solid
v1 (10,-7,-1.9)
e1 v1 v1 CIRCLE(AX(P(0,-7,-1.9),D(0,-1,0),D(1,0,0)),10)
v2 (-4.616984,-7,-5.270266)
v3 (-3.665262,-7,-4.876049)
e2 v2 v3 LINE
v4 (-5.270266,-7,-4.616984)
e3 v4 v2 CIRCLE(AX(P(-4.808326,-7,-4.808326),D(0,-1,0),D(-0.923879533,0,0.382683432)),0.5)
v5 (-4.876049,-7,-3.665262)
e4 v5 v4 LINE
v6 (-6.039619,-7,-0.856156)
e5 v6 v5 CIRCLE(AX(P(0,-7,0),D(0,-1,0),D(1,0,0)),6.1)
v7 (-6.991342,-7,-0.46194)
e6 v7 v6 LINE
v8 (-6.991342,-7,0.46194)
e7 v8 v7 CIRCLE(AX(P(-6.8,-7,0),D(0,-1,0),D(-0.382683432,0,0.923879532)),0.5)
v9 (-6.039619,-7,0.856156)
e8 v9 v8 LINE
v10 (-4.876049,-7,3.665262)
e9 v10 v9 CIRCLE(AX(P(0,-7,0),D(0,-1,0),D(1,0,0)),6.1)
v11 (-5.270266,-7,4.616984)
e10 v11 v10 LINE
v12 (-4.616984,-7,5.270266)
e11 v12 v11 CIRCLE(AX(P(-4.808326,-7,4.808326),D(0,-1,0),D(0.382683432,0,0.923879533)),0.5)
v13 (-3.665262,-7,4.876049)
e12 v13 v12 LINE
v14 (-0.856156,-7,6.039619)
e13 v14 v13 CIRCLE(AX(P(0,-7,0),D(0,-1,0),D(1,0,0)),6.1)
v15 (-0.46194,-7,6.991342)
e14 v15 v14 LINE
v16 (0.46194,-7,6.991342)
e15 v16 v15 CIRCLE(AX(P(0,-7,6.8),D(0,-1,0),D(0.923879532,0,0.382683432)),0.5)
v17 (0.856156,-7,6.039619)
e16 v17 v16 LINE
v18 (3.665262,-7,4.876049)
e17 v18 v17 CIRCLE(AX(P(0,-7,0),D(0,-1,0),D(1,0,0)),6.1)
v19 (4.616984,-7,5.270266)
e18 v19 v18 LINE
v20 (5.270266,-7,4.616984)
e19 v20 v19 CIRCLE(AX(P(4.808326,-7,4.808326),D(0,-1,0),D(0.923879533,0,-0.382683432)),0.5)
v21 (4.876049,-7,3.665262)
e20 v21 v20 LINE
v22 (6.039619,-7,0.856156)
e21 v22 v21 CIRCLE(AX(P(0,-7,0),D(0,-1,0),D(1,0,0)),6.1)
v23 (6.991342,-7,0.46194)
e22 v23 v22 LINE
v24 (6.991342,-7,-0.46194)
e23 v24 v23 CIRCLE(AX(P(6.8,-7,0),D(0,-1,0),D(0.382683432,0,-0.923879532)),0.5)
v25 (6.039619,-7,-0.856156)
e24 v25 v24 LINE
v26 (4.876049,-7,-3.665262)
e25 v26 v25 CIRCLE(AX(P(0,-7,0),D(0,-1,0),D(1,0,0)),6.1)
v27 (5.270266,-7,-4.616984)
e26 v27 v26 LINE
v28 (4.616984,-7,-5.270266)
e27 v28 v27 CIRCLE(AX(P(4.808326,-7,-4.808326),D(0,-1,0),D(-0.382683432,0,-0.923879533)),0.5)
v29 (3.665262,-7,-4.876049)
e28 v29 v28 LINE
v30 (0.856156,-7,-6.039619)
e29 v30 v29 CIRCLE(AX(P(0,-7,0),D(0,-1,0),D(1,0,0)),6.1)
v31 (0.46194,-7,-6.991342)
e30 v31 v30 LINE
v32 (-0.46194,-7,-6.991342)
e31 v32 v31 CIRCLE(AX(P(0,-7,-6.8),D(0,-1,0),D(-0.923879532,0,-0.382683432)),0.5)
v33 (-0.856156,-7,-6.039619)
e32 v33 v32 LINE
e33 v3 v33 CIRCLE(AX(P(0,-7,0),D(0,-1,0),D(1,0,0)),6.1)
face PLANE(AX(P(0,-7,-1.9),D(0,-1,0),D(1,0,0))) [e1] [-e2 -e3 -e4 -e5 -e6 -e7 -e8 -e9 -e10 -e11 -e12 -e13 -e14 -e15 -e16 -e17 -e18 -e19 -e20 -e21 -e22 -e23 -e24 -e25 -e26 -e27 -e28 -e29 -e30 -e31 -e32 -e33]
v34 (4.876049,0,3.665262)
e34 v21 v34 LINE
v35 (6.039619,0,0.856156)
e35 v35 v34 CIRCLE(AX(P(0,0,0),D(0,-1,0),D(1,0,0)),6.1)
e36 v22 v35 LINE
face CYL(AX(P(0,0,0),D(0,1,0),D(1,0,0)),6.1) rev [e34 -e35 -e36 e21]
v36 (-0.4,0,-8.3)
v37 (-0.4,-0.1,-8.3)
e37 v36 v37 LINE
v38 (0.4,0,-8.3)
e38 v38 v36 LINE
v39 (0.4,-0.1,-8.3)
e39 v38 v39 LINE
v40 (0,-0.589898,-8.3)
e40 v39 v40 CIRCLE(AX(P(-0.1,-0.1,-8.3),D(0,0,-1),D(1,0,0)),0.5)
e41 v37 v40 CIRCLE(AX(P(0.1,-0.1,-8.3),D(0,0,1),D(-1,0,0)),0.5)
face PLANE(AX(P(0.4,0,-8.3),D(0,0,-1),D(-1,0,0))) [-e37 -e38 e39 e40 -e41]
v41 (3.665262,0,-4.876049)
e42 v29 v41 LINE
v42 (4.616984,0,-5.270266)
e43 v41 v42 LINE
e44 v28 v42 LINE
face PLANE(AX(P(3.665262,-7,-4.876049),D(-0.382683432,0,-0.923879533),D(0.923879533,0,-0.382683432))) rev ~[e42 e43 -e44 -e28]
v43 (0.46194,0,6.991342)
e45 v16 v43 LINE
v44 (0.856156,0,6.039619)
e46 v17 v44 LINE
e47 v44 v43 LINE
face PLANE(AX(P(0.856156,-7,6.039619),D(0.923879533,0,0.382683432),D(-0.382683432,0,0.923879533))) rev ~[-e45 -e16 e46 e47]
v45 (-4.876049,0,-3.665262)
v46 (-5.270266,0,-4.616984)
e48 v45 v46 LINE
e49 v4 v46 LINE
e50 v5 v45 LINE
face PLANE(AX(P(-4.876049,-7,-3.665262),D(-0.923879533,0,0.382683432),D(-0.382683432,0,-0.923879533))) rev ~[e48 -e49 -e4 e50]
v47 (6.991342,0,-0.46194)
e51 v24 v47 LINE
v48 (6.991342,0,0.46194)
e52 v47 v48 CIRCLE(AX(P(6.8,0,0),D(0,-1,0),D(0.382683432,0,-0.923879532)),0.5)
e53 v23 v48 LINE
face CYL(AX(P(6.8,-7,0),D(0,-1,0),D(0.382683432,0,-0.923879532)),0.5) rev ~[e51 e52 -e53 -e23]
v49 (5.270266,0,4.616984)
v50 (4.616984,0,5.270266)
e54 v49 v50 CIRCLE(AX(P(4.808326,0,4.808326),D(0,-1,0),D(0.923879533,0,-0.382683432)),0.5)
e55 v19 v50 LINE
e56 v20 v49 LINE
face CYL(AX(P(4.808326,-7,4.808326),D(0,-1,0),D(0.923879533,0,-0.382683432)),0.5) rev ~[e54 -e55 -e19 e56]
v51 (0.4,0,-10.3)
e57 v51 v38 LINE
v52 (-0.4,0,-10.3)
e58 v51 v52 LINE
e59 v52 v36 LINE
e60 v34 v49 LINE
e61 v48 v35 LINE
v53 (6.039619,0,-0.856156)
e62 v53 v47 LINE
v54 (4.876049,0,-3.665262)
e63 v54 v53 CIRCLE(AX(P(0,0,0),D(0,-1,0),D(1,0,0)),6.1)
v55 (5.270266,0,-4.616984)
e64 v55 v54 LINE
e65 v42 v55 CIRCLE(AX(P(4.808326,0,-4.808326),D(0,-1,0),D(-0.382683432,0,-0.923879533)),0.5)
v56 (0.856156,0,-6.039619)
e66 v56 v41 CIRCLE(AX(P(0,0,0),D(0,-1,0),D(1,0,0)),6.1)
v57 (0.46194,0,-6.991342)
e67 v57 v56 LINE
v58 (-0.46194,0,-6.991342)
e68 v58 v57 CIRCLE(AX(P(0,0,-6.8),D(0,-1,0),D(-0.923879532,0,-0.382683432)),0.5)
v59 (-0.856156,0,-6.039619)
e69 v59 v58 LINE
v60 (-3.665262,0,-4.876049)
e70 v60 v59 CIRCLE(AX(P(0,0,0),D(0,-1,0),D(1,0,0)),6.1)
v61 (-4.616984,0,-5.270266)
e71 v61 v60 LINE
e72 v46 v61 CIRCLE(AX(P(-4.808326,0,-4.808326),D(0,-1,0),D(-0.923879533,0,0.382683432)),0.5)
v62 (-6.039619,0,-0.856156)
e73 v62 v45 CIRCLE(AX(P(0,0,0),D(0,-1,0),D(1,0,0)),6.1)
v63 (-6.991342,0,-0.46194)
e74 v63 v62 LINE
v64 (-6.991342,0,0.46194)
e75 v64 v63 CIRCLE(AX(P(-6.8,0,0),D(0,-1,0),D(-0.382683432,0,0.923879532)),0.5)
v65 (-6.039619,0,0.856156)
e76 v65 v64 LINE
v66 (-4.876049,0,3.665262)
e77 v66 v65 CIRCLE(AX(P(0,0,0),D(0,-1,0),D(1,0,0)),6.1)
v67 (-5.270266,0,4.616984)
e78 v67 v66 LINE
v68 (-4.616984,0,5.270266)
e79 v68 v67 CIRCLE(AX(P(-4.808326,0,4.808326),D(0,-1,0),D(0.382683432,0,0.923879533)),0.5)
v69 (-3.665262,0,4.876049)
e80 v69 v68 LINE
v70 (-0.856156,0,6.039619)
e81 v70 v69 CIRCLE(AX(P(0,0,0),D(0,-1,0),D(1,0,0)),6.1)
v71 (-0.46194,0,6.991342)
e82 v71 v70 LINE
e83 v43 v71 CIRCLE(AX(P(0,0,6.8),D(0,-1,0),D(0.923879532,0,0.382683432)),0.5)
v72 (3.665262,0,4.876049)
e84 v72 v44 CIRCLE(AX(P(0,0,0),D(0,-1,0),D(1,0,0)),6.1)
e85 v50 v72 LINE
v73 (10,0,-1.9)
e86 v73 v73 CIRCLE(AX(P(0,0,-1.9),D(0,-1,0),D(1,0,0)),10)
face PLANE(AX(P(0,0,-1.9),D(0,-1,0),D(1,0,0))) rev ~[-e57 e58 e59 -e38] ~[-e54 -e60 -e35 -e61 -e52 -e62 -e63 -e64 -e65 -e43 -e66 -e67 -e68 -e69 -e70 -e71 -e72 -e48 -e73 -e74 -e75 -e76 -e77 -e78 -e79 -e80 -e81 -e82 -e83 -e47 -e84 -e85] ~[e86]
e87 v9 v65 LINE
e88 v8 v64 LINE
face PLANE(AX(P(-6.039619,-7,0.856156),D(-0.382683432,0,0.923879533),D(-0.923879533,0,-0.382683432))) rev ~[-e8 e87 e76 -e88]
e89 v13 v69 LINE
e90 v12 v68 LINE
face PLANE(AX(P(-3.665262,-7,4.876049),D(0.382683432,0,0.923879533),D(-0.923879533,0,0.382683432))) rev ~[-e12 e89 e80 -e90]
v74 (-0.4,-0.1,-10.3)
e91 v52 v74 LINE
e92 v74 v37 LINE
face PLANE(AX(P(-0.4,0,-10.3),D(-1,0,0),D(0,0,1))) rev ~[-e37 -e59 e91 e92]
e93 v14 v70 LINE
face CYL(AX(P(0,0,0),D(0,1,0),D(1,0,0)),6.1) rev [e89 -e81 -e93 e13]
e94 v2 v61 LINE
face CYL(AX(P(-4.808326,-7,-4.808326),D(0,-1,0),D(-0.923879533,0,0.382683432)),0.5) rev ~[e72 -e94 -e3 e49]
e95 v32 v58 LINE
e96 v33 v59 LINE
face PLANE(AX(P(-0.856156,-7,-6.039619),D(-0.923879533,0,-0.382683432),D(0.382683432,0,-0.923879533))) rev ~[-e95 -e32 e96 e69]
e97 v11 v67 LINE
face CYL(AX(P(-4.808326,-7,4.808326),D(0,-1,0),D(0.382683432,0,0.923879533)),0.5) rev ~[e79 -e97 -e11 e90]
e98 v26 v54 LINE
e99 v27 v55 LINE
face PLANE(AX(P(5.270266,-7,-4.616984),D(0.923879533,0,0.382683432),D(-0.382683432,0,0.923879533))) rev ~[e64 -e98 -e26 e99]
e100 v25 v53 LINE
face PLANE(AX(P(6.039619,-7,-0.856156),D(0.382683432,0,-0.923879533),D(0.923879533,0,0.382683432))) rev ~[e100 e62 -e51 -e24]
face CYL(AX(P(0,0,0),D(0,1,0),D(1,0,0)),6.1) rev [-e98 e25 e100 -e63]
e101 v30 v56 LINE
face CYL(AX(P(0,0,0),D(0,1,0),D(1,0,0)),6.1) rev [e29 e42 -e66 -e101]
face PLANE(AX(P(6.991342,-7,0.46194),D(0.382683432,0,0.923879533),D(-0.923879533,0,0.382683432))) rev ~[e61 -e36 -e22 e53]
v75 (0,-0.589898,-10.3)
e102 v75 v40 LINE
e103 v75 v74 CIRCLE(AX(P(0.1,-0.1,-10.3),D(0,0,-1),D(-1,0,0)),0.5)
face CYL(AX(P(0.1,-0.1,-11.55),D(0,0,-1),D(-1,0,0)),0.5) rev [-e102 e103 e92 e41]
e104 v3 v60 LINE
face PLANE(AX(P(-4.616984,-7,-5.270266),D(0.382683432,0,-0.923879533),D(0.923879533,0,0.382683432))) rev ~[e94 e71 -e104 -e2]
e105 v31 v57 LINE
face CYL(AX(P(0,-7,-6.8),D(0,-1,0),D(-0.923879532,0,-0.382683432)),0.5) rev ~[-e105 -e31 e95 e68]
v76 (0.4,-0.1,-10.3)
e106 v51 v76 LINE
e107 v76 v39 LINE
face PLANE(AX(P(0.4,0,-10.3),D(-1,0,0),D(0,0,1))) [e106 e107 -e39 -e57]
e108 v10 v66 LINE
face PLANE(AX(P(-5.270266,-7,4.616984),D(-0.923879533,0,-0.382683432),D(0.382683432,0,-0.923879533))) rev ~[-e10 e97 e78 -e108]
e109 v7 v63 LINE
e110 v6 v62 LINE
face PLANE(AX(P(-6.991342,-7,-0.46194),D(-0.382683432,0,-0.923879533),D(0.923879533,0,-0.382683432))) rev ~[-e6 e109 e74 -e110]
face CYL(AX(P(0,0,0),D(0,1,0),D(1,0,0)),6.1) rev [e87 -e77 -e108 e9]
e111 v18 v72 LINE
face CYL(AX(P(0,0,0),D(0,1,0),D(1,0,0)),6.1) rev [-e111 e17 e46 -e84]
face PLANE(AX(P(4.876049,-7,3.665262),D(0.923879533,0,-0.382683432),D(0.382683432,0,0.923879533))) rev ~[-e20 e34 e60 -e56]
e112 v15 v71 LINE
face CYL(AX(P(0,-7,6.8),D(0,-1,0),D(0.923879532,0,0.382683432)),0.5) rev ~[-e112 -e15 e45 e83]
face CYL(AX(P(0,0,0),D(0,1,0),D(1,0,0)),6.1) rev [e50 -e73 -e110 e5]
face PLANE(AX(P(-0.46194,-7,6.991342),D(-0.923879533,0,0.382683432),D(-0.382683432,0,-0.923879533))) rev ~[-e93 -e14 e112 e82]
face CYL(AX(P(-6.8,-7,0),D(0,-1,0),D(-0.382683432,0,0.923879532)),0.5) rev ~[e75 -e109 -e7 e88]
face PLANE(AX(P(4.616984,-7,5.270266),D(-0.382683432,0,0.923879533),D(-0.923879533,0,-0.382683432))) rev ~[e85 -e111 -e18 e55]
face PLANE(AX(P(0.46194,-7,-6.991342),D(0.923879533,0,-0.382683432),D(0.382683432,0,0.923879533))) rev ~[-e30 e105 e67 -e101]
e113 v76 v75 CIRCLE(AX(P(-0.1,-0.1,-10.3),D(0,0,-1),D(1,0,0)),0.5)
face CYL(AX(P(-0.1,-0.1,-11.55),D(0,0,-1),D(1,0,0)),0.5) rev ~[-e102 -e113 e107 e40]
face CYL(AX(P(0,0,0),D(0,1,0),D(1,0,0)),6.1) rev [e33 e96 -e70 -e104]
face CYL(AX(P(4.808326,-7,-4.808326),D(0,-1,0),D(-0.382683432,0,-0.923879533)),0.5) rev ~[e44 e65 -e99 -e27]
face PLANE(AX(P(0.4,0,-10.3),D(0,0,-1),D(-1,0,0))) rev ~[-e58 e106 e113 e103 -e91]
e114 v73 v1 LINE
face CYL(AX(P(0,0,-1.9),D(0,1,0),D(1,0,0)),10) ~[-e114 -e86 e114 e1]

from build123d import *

# Parameters (mm, degrees)
F0_R            = 10
F0_R_2          = 6.1
F1_DEPTH        = 7
F3_DEPTH        = 7
F3_COPIES_COUNT = 8
F4_W            = 0.8
F4_H            = 2
F5_DEPTH        = 0.6
F6_T1_DEPTH     = 3.25


# Not quite as in the source:
# - a fillet or chamfer that OpenCascade refuses, or shapes differently, is made with other operations: its cross-section is extruded or revolved along the edge and cut away or added
# - a pattern or mirror of a feature is missing from the dataset's text; its kind, count and spacing are read off the source's solid


with BuildPart() as f1:
    # F0 (on Front) → F1 (new body)
    with BuildSketch(Plane.XZ):
        with Locations((0, -1.9)):
            Circle(F0_R)
        Circle(F0_R_2, mode=Mode.SUBTRACT)
    extrude(amount=F1_DEPTH)

    # F2 (on face) → F3 (cut)
    with BuildSketch(Plane.XZ.offset(7)):
        with BuildLine():
            Line((6.9913417162, 0.4619397663), (6.0396188995, 0.8561562646))
            ThreePointArc((6.0396188995, 0.8561562646), (6.0848860008, 0.429141418), (6.1, 0))
            ThreePointArc((6.1, 0), (6.0848860008, -0.429141418), (6.0396188995, -0.8561562646))
            Line((6.0396188995, -0.8561562646), (6.9913417162, -0.4619397663))
            ThreePointArc((6.9913417162, -0.4619397663), (7.3, 0), (6.9913417162, 0.4619397663))
        make_face()
    f3 = extrude(amount=-F3_DEPTH, mode=Mode.SUBTRACT)

    # F3_copies: F3 ×8 about axis
    f3_copies_axis = Axis((0, 0, 0), (0, 1, 0))
    for i in range(1, F3_COPIES_COUNT):
        add(f3.rotate(f3_copies_axis, i * 360 / F3_COPIES_COUNT), mode=Mode.SUBTRACT)

    # F4 (on face) → F5 (cut)
    with BuildSketch(Plane(origin=(0, 0, 0), x_dir=(-1, 0, 0), z_dir=(0, 1, 0))):
        with Locations((0, -9.3)):
            Rectangle(F4_W, F4_H)
    extrude(amount=-F5_DEPTH, mode=Mode.SUBTRACT)

    # F6: fillet of radius 0.5 on 2 edges, made by hand

    # F6_s2 → F6_t1 (join)
    with BuildSketch(Plane.XY.offset(-11.55)):
        with BuildLine():
            ThreePointArc((0.4, -0.1), (0.2535533906, -0.4535533906), (-0.1, -0.6))
            Line((-0.1, -0.6), (0.4, -0.6))
            Line((0.4, -0.6), (0.4, -0.1))
        make_face()
        with BuildLine():
            ThreePointArc((-0.4, -0.1), (-0.2535533906, -0.4535533906), (0.1, -0.6))
            Line((0.1, -0.6), (-0.4, -0.6))
            Line((-0.4, -0.6), (-0.4, -0.1))
        make_face()
    extrude(amount=F6_T1_DEPTH)


solid = f1.part
